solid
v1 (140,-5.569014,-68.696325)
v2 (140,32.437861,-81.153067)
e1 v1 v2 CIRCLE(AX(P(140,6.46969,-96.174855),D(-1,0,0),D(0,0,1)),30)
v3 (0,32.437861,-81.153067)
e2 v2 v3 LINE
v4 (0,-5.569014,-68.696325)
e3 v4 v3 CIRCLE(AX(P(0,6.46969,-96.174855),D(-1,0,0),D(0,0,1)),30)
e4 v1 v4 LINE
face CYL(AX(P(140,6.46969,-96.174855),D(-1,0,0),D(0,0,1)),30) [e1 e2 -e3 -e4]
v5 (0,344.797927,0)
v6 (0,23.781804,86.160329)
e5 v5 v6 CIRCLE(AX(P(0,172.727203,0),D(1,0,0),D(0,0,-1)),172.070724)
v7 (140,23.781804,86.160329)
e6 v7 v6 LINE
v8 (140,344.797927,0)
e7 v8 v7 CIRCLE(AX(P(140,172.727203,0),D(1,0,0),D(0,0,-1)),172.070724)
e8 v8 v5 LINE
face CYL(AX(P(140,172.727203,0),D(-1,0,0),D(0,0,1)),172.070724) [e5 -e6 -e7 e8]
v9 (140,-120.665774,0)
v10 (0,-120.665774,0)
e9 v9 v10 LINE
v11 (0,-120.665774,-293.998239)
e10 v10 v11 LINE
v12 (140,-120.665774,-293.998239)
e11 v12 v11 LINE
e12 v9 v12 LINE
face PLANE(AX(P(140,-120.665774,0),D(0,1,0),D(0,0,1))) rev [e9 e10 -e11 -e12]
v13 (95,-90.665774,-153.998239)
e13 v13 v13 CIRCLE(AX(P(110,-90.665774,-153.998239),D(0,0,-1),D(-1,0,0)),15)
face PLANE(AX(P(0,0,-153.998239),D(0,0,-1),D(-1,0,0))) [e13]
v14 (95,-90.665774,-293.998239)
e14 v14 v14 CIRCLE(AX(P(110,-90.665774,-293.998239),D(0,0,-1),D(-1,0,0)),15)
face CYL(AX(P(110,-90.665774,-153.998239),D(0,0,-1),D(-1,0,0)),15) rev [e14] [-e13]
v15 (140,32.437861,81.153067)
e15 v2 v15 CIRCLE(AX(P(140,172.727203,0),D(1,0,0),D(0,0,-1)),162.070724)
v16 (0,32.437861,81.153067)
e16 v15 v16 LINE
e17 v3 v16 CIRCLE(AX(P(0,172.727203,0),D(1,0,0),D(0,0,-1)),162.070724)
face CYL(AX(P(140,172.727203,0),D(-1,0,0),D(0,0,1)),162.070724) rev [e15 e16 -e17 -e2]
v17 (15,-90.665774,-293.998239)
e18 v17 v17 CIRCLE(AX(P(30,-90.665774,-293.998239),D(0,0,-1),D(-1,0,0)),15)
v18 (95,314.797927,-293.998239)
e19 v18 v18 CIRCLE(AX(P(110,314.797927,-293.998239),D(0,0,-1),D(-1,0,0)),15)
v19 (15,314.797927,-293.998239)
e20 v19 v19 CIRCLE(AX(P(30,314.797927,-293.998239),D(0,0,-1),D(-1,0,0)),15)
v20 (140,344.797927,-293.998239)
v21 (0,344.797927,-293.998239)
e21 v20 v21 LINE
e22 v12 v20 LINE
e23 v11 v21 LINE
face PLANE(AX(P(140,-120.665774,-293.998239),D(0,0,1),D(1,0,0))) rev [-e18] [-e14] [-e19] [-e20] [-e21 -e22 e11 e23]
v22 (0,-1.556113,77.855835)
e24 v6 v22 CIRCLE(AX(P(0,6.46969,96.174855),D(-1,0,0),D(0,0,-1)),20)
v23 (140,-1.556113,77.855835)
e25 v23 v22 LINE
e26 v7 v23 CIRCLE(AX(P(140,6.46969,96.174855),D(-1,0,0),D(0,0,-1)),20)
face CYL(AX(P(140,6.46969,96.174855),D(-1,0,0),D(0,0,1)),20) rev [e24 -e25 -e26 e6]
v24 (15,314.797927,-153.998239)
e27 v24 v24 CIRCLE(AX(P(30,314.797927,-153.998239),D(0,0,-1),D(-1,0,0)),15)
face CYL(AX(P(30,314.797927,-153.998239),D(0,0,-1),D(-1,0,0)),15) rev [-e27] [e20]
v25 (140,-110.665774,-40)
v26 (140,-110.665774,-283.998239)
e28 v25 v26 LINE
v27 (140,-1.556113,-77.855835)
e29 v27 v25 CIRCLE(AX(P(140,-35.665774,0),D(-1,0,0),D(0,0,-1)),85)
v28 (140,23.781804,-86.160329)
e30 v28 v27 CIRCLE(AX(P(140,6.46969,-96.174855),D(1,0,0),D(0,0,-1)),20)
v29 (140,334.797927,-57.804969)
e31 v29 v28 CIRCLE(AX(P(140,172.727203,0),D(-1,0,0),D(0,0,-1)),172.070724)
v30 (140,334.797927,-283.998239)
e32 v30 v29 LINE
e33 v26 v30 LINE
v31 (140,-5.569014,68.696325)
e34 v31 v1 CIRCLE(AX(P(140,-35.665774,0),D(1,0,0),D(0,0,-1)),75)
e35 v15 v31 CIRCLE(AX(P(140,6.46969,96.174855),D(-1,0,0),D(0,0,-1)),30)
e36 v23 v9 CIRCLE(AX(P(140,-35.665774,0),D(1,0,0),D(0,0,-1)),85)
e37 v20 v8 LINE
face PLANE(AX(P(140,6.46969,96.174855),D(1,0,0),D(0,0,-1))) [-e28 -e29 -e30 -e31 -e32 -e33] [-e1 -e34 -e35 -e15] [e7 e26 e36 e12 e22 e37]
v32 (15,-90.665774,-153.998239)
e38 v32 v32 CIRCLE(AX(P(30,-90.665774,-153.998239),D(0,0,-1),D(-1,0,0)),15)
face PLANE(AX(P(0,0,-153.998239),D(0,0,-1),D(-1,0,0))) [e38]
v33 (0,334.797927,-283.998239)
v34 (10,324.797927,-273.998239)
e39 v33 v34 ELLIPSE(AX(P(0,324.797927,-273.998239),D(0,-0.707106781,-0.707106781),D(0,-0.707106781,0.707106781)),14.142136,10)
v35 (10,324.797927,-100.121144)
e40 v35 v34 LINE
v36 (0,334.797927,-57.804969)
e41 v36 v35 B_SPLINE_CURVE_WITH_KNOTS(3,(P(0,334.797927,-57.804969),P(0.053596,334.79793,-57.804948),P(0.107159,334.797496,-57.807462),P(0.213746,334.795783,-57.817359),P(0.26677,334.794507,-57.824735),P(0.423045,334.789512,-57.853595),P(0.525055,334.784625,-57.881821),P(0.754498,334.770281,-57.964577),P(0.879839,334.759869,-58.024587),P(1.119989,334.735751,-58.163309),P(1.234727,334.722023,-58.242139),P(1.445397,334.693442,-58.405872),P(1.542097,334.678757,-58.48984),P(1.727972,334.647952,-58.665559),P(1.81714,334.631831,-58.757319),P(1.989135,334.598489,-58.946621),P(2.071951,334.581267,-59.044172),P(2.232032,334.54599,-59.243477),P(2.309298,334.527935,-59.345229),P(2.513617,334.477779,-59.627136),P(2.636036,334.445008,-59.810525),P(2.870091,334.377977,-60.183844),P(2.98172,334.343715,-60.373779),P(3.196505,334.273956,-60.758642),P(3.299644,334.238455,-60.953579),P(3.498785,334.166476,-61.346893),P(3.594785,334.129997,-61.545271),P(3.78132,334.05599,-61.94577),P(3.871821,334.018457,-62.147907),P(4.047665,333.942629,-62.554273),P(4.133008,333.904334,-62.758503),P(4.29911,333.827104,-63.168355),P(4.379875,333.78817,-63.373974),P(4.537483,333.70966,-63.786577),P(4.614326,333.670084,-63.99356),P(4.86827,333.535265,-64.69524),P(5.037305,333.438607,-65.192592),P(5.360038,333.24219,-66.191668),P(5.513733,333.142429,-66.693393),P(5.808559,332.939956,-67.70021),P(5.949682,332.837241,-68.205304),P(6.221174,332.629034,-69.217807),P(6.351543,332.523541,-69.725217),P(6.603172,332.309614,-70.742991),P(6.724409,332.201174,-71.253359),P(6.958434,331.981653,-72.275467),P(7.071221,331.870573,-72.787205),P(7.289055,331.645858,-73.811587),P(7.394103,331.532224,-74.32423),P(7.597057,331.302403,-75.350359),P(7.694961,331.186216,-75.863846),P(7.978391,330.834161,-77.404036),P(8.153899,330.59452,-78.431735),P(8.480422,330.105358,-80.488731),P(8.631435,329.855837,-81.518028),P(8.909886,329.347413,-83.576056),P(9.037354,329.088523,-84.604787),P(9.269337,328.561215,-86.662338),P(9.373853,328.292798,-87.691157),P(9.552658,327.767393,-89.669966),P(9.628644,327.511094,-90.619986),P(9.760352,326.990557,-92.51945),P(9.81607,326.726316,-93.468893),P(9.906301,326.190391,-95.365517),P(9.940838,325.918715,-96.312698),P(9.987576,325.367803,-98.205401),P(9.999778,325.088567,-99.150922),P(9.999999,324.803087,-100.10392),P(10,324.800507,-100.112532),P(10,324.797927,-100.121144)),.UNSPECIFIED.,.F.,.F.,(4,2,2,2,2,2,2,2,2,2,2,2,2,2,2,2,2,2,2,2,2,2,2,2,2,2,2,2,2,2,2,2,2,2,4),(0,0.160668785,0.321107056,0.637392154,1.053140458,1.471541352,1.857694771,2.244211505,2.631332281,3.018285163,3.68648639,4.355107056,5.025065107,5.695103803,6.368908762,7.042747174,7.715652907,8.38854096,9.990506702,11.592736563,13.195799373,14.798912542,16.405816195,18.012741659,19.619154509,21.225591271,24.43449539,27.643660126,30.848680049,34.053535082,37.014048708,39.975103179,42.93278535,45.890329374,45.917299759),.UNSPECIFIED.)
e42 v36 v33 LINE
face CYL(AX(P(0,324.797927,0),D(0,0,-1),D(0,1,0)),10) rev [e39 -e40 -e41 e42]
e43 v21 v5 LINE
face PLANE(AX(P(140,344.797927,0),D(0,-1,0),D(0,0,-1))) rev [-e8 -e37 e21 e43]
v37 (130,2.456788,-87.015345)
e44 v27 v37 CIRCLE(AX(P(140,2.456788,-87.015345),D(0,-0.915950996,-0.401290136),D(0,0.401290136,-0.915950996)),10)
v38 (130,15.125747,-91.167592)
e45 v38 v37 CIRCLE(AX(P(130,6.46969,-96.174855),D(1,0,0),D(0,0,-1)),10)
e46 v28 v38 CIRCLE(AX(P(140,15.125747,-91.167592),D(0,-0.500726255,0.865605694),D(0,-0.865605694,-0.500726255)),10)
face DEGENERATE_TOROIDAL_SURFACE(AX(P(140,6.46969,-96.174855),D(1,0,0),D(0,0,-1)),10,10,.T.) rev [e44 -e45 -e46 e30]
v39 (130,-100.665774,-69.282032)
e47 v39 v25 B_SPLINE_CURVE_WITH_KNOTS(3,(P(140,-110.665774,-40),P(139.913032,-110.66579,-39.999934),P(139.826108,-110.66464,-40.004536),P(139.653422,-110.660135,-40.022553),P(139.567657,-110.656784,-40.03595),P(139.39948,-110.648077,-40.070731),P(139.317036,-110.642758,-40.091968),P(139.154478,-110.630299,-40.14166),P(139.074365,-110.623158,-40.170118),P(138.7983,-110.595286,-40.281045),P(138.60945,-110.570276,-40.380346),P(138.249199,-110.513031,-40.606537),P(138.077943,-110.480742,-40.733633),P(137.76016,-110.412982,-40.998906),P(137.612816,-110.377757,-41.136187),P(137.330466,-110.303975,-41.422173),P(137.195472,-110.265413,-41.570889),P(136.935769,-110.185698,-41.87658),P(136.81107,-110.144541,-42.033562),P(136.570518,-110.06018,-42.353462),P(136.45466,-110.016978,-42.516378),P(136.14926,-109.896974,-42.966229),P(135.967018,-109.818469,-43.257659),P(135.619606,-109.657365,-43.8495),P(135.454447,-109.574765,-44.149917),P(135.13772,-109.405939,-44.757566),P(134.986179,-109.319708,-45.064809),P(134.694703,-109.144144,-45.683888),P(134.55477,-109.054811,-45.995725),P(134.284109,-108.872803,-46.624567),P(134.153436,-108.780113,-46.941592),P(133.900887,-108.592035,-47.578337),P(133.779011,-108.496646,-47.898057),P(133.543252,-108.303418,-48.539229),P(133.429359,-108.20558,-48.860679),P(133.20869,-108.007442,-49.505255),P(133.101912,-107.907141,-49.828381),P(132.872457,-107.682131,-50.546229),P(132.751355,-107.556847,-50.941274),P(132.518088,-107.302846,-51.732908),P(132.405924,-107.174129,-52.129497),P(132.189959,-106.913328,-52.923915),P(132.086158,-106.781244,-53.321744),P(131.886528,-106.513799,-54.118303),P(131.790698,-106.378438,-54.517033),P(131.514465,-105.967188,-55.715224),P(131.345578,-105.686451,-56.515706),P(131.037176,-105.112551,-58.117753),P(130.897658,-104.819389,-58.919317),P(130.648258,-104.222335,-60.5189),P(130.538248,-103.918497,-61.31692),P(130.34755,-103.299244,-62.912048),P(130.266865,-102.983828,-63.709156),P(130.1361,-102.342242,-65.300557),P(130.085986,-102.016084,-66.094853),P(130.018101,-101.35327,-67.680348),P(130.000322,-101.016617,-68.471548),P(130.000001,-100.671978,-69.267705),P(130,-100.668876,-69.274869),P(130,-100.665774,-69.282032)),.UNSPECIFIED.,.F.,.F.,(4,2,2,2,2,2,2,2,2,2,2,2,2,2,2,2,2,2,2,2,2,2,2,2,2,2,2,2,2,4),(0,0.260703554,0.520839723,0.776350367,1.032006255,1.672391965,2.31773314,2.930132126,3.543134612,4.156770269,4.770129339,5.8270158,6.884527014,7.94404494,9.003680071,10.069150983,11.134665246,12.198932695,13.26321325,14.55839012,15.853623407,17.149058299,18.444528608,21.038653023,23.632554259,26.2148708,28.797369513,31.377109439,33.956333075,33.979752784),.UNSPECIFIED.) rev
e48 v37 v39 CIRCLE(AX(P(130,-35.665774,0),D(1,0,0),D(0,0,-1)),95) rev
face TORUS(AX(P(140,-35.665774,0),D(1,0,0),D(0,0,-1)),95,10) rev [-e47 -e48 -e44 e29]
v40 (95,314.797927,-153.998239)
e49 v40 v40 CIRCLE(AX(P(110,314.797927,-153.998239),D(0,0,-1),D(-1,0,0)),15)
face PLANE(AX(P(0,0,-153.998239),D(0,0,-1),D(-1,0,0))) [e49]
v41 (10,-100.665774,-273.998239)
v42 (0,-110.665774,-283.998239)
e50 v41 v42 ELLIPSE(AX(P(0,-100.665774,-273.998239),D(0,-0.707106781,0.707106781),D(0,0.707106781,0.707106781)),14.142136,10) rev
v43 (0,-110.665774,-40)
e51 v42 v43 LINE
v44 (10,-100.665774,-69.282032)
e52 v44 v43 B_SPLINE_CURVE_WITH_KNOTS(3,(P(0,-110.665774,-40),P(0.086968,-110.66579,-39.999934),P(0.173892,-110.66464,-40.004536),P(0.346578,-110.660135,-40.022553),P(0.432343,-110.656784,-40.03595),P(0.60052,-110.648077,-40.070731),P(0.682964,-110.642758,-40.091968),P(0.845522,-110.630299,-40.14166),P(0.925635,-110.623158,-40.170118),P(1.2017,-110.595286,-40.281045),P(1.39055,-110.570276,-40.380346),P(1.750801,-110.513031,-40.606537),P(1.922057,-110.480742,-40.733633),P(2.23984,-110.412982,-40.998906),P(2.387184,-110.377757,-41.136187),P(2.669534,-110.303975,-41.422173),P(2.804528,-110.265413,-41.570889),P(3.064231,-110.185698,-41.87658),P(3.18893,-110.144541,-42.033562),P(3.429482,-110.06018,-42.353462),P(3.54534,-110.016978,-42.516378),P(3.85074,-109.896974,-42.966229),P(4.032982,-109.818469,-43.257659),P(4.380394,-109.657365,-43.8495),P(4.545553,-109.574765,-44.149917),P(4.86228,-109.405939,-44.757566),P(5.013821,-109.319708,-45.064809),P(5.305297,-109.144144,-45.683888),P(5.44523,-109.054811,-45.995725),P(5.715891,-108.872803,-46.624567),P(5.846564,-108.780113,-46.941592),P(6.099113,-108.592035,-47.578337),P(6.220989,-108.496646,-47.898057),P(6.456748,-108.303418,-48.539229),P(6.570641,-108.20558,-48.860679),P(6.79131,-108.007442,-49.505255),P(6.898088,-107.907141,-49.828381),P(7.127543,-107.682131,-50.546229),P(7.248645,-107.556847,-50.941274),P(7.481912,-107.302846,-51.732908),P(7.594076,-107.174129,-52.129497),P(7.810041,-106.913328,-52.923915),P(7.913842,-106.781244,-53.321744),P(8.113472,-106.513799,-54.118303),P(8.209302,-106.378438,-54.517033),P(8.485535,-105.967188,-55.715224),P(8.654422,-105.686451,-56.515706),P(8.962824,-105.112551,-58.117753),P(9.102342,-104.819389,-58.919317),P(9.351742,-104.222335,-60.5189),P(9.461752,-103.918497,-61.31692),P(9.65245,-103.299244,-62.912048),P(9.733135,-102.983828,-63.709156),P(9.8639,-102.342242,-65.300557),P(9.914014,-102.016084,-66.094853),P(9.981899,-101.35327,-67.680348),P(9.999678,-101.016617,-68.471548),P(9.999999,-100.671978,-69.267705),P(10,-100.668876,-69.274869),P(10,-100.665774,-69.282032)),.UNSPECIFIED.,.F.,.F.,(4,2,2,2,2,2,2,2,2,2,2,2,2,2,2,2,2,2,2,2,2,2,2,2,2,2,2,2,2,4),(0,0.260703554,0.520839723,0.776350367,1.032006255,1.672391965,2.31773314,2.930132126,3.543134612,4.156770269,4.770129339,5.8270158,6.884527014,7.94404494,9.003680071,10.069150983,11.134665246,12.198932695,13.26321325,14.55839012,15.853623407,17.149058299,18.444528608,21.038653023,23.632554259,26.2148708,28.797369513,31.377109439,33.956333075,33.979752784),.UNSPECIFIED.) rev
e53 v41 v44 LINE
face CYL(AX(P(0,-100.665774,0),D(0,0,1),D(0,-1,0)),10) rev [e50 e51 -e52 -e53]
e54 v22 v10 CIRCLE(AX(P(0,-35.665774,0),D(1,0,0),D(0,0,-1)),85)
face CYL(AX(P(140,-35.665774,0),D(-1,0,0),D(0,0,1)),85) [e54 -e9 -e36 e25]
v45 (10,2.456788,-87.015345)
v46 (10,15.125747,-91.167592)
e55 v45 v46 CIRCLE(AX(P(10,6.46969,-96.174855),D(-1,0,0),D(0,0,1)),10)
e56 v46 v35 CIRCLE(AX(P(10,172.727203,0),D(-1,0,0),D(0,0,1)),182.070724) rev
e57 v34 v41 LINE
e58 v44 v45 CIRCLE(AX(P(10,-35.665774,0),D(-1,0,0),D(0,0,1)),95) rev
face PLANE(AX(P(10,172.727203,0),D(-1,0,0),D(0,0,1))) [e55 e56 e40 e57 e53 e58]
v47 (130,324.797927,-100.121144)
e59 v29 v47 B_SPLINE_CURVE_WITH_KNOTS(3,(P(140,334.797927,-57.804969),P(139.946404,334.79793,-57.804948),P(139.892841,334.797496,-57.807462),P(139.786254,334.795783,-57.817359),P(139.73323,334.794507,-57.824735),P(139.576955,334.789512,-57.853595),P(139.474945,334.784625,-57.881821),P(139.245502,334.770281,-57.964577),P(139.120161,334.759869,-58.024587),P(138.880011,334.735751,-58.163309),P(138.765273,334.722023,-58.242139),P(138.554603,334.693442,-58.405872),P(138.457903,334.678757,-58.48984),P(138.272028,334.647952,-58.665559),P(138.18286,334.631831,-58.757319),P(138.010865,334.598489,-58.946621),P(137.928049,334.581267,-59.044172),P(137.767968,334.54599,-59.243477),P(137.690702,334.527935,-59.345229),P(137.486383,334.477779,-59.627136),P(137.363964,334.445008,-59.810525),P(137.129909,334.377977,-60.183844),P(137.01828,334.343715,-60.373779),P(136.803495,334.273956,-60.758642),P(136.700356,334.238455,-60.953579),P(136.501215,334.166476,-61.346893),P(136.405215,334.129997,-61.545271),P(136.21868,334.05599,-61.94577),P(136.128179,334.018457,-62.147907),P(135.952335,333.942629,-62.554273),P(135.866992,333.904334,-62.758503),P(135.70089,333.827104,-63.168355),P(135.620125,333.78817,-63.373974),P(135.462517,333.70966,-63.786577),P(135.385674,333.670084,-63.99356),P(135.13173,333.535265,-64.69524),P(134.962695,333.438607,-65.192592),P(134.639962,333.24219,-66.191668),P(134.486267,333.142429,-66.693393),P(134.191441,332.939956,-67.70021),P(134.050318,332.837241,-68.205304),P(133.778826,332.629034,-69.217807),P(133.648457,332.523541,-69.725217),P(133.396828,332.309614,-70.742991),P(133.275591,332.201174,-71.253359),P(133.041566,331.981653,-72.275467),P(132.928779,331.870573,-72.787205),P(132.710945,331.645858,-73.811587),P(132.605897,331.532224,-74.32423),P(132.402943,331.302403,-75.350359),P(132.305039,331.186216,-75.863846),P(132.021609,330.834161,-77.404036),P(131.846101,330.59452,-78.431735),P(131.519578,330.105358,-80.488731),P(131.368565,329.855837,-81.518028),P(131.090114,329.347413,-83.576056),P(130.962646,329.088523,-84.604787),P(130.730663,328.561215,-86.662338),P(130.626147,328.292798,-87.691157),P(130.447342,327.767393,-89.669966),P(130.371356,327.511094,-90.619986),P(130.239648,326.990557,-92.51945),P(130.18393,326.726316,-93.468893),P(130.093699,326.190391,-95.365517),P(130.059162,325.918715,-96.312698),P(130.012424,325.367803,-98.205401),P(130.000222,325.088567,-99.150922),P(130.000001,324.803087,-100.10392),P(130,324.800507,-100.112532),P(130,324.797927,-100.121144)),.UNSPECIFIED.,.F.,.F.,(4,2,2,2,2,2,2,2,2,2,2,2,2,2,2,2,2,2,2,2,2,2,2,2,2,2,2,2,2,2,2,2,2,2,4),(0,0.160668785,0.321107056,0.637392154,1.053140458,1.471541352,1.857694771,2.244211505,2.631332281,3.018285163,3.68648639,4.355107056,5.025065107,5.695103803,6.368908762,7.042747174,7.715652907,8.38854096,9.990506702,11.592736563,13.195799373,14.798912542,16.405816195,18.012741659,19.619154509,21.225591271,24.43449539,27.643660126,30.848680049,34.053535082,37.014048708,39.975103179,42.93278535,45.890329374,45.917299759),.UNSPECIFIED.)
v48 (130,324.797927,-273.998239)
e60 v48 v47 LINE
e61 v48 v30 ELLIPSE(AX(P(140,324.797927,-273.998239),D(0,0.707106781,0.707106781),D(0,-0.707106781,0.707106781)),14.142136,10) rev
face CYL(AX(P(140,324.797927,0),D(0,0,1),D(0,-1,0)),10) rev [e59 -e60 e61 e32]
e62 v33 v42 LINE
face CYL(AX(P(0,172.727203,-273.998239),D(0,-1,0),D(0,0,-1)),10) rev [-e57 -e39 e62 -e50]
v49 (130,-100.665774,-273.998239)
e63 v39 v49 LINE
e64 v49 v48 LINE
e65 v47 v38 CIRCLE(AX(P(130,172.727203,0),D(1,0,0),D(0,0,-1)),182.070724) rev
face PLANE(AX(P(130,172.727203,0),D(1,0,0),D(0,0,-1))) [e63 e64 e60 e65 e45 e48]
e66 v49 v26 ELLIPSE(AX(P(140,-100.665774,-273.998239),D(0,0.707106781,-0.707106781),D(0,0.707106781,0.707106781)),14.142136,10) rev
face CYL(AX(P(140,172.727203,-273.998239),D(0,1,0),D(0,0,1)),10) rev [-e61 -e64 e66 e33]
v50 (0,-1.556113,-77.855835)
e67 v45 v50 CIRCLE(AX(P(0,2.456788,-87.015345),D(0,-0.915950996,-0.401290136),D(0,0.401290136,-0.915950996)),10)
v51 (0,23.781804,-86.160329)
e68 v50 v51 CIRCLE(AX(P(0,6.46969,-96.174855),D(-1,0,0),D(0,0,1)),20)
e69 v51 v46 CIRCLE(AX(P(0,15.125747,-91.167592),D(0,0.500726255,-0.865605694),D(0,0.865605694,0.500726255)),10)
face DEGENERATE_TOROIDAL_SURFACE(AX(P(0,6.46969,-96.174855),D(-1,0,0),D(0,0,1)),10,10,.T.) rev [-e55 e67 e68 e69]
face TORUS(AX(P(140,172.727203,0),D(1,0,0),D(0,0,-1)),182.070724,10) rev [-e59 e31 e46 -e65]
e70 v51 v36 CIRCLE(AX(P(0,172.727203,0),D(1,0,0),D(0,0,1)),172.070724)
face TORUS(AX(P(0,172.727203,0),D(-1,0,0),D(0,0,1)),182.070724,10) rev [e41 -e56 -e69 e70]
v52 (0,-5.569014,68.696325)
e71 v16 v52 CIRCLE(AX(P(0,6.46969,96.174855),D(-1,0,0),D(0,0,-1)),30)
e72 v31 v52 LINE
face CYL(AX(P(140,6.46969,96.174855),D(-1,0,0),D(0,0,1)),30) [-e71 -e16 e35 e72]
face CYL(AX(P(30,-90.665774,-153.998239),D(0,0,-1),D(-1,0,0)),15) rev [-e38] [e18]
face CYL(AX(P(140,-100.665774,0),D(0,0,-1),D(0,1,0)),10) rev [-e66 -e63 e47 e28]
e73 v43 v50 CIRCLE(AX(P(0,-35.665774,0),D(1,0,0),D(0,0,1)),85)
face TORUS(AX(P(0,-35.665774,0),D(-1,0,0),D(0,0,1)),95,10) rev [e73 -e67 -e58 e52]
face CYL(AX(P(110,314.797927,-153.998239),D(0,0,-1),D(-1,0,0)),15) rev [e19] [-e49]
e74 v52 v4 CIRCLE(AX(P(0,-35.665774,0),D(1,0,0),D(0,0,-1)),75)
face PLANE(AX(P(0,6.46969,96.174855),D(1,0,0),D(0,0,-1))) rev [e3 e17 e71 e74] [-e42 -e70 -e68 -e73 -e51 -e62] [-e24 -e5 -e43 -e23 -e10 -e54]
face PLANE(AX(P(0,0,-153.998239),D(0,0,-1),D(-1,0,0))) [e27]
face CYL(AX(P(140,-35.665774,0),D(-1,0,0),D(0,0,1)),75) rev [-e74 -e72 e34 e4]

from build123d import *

# Parameters (mm, degrees)
BOSS_EXTRUDE1_DEPTH = 140
SKETCH2_R           = 15
CUT_EXTRUDE1_DEPTH  = 140
CUT_EXTRUDE2_START  = -10
CUT_EXTRUDE2_DEPTH  = 10
CUT_EXTRUDE3_DEPTH  = 10
FILLET1_R           = 10


with BuildPart() as part:
    # Sketch1 → Boss-Extrude1 (new body)
    with BuildSketch(Plane(origin=(0, 0, 0), x_dir=(0, 0, -1), z_dir=(1, 0, 0))):
        with BuildLine():
            Line((0, -120.66577438), (293.9982389, -120.66577438))
            Line((293.9982389, -120.66577438), (293.9982389, 344.79792692))
            Line((293.9982389, 344.79792692), (0, 344.79792692))
            ThreePointArc((0, 344.79792692), (-166.188863738, 217.33208751), (-86.160329475, 23.781803731))
            ThreePointArc((-86.160329475, 23.781803731), (-77.169593528, 12.698658653), (-77.855834661, -1.556112857))
            ThreePointArc((-77.855834661, -1.556112857), (-71.148862357, -82.172111425), (0, -120.66577438))
        make_face()
        with BuildLine():
            ThreePointArc((81.153066922, 32.43786067), (0, 334.79792692), (-81.153066922, 32.43786067))
            ThreePointArc((-81.153066922, 32.43786067), (-67.666963002, 15.813143052), (-68.696324701, -5.569014213))
            ThreePointArc((-68.696324701, -5.569014213), (0, -110.66577438), (68.696324701, -5.569014213))
            ThreePointArc((68.696324701, -5.569014213), (67.666963002, 15.813143052), (81.153066922, 32.43786067))
        make_face(mode=Mode.SUBTRACT)
    extrude(amount=BOSS_EXTRUDE1_DEPTH)

    # Sketch2 → Cut-Extrude1 (cut)
    with BuildSketch(Plane(origin=(0, 0, -293.9982389), x_dir=(-1, 0, 0), z_dir=(0, 0, -1))):
        with Locations((-110, 314.79792692)):
            Circle(SKETCH2_R)
        with Locations((-30, -90.66577438)):
            Circle(SKETCH2_R)
        with Locations((-110, -90.66577438)):
            Circle(SKETCH2_R)
        with Locations((-30, 314.79792692)):
            Circle(SKETCH2_R)
    extrude(amount=-CUT_EXTRUDE1_DEPTH, mode=Mode.SUBTRACT)

    # Sketch3 → Cut-Extrude2 (cut)
    with BuildSketch(Plane(origin=(140, 0, 0), x_dir=(0, 0, -1), z_dir=(1, 0, 0)).offset(CUT_EXTRUDE2_START)):
        with BuildLine():
            Line((40, -110.66577438), (283.9982389, -110.66577438))
            Line((283.9982389, -110.66577438), (283.9982389, 334.79792692))
            Line((283.9982389, 334.79792692), (57.804969406, 334.79792692))
            ThreePointArc((57.804969406, 334.79792692), (171.360027548, 188.350107316), (86.160329475, 23.781803731))
            ThreePointArc((86.160329475, 23.781803731), (77.169593528, 12.698658653), (77.855834661, -1.556112857))
            ThreePointArc((77.855834661, -1.556112857), (80.303978733, -63.527414671), (40, -110.66577438))
        make_face()
    extrude(amount=CUT_EXTRUDE2_DEPTH, mode=Mode.SUBTRACT)

    # Sketch4 → Cut-Extrude3 (cut)
    with BuildSketch(Plane.ZY):
        with BuildLine():
            Line((-57.804969406, 334.79792692), (-283.9982389, 334.79792692))
            Line((-283.9982389, 334.79792692), (-283.9982389, -110.66577438))
            Line((-283.9982389, -110.66577438), (-40, -110.66577438))
            ThreePointArc((-40, -110.66577438), (-80.303978733, -63.527414671), (-77.855834661, -1.556112857))
            ThreePointArc((-77.855834661, -1.556112857), (-77.169593528, 12.698658653), (-86.160329475, 23.781803731))
            ThreePointArc((-86.160329475, 23.781803731), (-171.360027548, 188.350107316), (-57.804969406, 334.79792692))
        make_face()
    extrude(amount=-CUT_EXTRUDE3_DEPTH, mode=Mode.SUBTRACT)

    # Fillet1
    fillet1_edges = [part.edges().sort_by_distance(p)[0] for p in [
        (130, 334.79792692, -170.901604153),
        (130, 112.06607627, -283.9982389),
        (130, -110.66577438, -161.99911945),
        (130, -63.527414671, -80.303978733),
        (130, 12.698658653, -77.169593528),
        (130, 188.350107316, -171.360027548),
        (10, 12.698658653, -77.169593528),
        (10, -63.527414671, -80.303978733),
        (10, -110.66577438, -161.99911945),
        (10, 112.06607627, -283.9982389),
        (10, 334.79792692, -170.901604153),
        (10, 188.350107316, -171.360027548),
    ]]
    fillet(fillet1_edges, radius=FILLET1_R - 0.0001)  # a hair under: the kernel refuses the full size


solid = part.part
